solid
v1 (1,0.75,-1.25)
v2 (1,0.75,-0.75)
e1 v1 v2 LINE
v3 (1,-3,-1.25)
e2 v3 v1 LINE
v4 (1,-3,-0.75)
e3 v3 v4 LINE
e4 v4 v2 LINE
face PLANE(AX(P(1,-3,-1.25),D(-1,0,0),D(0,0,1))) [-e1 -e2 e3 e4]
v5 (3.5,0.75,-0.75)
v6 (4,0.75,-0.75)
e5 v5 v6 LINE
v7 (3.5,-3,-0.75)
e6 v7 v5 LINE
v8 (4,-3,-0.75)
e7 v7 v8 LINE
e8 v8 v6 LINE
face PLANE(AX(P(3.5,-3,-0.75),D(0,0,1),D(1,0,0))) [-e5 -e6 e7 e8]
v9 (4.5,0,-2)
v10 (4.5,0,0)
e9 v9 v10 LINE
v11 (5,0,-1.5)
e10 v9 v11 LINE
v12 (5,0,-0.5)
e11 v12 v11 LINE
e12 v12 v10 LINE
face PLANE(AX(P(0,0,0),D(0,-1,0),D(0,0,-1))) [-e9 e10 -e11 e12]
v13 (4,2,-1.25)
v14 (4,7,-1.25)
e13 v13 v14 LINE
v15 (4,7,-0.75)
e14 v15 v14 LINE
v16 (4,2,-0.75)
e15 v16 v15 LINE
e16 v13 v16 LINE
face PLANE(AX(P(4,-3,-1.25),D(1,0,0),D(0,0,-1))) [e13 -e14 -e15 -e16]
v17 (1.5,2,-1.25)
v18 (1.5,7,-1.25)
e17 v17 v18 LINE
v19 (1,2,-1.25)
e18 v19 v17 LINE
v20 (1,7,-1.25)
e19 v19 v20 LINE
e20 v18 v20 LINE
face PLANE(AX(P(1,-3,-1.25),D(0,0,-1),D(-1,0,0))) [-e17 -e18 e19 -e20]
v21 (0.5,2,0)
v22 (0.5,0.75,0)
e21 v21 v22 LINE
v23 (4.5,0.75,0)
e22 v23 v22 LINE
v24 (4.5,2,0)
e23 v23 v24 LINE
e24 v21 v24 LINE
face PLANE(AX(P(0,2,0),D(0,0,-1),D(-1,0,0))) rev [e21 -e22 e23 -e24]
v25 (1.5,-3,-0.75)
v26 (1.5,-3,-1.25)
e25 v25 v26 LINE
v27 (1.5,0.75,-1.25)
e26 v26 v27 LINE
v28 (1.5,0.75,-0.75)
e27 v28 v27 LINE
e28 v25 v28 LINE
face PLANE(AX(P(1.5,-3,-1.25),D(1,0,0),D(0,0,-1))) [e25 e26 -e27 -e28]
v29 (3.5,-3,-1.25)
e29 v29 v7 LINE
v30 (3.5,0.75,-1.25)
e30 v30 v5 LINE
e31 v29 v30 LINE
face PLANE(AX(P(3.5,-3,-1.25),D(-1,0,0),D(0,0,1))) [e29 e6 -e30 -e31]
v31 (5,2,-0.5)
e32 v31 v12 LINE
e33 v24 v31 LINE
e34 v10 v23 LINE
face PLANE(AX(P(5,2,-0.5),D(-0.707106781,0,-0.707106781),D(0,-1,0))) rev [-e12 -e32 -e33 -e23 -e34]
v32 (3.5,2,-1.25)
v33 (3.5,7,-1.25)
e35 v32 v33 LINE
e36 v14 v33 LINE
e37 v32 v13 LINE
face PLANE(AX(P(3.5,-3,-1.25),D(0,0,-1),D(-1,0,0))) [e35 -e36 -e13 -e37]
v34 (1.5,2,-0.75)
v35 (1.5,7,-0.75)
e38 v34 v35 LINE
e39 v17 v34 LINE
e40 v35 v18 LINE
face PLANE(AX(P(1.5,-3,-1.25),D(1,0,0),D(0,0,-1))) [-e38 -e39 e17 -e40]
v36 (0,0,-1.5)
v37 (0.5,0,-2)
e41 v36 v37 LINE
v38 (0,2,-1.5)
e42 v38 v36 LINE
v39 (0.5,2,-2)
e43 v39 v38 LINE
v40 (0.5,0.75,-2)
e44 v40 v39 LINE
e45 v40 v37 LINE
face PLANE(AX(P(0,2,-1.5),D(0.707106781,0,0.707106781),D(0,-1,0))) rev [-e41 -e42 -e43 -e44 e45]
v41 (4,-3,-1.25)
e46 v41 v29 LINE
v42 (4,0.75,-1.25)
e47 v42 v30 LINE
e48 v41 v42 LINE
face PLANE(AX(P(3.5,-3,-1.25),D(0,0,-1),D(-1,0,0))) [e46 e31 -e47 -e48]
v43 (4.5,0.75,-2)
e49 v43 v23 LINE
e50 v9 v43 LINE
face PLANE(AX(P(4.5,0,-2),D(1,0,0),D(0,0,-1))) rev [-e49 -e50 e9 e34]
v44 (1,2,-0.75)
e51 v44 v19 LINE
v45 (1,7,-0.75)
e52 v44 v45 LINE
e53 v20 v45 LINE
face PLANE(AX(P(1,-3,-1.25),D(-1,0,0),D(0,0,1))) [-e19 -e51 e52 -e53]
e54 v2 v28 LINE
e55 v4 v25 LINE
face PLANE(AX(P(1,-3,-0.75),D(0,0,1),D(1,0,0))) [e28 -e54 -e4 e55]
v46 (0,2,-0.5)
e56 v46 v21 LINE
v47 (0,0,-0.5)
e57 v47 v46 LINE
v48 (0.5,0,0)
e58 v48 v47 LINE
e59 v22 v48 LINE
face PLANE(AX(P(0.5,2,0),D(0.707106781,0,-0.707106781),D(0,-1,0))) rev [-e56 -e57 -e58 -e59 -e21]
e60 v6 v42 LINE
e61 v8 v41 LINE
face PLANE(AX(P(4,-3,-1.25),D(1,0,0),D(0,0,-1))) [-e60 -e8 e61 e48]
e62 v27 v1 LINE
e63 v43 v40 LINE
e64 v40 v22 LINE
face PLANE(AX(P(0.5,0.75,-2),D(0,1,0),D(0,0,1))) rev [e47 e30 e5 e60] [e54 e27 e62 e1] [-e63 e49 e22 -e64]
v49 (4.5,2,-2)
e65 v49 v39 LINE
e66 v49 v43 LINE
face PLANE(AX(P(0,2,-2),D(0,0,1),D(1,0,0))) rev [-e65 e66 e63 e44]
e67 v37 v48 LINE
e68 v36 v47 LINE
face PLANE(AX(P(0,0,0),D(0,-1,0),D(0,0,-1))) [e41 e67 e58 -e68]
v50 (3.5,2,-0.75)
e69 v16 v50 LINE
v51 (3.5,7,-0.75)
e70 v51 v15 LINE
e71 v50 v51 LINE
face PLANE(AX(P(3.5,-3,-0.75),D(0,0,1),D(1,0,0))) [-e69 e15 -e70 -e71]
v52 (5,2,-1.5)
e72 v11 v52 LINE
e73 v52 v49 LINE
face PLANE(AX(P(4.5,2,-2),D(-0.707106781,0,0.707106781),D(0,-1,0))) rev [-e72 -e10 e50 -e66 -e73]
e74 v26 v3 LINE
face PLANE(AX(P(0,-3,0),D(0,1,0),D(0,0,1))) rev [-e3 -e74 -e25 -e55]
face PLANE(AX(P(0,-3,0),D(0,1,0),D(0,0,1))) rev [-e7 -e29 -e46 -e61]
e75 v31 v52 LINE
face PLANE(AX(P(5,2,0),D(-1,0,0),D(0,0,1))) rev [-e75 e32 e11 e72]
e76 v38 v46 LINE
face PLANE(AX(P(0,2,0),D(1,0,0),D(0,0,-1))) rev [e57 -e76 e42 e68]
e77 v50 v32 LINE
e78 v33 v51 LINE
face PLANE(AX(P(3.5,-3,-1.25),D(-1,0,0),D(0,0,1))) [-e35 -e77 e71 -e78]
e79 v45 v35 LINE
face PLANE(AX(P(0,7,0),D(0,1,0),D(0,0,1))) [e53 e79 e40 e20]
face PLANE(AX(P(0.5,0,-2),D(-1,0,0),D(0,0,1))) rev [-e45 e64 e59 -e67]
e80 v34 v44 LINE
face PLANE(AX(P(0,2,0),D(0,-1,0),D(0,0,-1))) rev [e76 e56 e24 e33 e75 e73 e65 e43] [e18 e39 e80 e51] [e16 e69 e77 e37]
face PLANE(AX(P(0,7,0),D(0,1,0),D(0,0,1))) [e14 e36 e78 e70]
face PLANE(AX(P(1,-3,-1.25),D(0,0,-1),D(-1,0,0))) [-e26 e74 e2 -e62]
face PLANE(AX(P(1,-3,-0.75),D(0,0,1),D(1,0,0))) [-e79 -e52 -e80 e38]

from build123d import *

# Parameters (mm, degrees)
SKETCH1_W                = 5
SKETCH1_H                = 2
BOSS_EXTRUDE1_DEPTH      = 2
SKETCH2_W                = 4
SKETCH2_H                = 0.75
CUT_EXTRUDE1_DEPTH       = 6.744562647
CHAMFER1_START           = -1.060660172
CHAMFER1_OUTLINE_W       = 1.403805922
CHAMFER1_OUTLINE_H       = 3
CHAMFER1_OUTLINE_W_2     = 1.353553391
CHAMFER1_DEPTH           = 4.242640687
CHAMFER1_START_2         = 3.181980515
CHAMFER1_2_OUTLINE_W     = 4.242640687
CHAMFER1_2_OUTLINE_H     = 3
CHAMFER1_2_DEPTH         = 1.818019485
CHAMFER1_START_3         = -1.414213562
CHAMFER1_3_OUTLINE_W     = 4.242640687
CHAMFER1_3_OUTLINE_H     = 3
CHAMFER1_3_DEPTH         = 0.35355339
BOSS_EXTRUDE2_DEPTH      = 5
BOSS_EXTRUDE2_DEPTH_BACK = 5
SKETCH3_W                = 0.5
SKETCH3_H                = 0.5


with BuildPart() as part:
    # Sketch1 → Boss-Extrude1 (new body)
    with BuildSketch(Plane(origin=(0, 0, 0), x_dir=(1, 0, 0), z_dir=(0, 1, 0))):
        with Locations((2.5, 1)):
            Rectangle(SKETCH1_W, SKETCH1_H)
    extrude(amount=BOSS_EXTRUDE1_DEPTH)

    # Sketch2 → Cut-Extrude1 (cut, through all)
    with BuildSketch(Plane.XY):
        with Locations((2.5, 0.375)):
            Rectangle(SKETCH2_W, SKETCH2_H)
    extrude(amount=-CUT_EXTRUDE1_DEPTH, mode=Mode.SUBTRACT)

    # Chamfer1: read off the stored shape, not the designer's step
    # Chamfer1 outline → Chamfer1 (cut)
    with BuildSketch(Plane(origin=(0, 0, 0), x_dir=(0.707106781186549, 0, -0.707106781186546), z_dir=(0.707106781186546, 0, 0.707106781186549)).offset(CHAMFER1_START)):
        with Locations((5.298097039, 1.5)):
            Rectangle(CHAMFER1_OUTLINE_W, CHAMFER1_OUTLINE_H)
        with Locations((-0.323223305, 1.5)):
            Rectangle(CHAMFER1_OUTLINE_W_2, CHAMFER1_OUTLINE_H)
    extrude(amount=CHAMFER1_DEPTH, mode=Mode.SUBTRACT)

    # Chamfer1 2 outline → Chamfer1 2 (cut)
    with BuildSketch(Plane(origin=(0, 0, 0), x_dir=(0.707106781186549, 0, -0.707106781186546), z_dir=(0.707106781186546, 0, 0.707106781186549)).offset(CHAMFER1_START_2)):
        with Locations((2.474873735, 1.5)):
            Rectangle(CHAMFER1_2_OUTLINE_W, CHAMFER1_2_OUTLINE_H)
    extrude(amount=CHAMFER1_2_DEPTH, mode=Mode.SUBTRACT)

    # Chamfer1 3 outline → Chamfer1 3 (cut)
    with BuildSketch(Plane(origin=(0, 0, 0), x_dir=(0.707106781186549, 0, -0.707106781186546), z_dir=(0.707106781186546, 0, 0.707106781186549)).offset(CHAMFER1_START_3)):
        with Locations((2.474873735, 1.5)):
            Rectangle(CHAMFER1_3_OUTLINE_W, CHAMFER1_3_OUTLINE_H)
    extrude(amount=CHAMFER1_3_DEPTH, mode=Mode.SUBTRACT)

    # Sketch3 → Boss-Extrude2 (add, two sides: drawn at the far end of the back side and taken through both)
    with BuildSketch(Plane(origin=(0, 2, 0), x_dir=(1, 0, 0), z_dir=(0, 1, 0)).offset(-BOSS_EXTRUDE2_DEPTH_BACK)):
        with Locations((1.25, 1)):
            Rectangle(SKETCH3_W, SKETCH3_H)
        with Locations((3.75, 1)):
            Rectangle(SKETCH3_W, SKETCH3_H)
    extrude(amount=BOSS_EXTRUDE2_DEPTH + BOSS_EXTRUDE2_DEPTH_BACK)


solid = part.part
